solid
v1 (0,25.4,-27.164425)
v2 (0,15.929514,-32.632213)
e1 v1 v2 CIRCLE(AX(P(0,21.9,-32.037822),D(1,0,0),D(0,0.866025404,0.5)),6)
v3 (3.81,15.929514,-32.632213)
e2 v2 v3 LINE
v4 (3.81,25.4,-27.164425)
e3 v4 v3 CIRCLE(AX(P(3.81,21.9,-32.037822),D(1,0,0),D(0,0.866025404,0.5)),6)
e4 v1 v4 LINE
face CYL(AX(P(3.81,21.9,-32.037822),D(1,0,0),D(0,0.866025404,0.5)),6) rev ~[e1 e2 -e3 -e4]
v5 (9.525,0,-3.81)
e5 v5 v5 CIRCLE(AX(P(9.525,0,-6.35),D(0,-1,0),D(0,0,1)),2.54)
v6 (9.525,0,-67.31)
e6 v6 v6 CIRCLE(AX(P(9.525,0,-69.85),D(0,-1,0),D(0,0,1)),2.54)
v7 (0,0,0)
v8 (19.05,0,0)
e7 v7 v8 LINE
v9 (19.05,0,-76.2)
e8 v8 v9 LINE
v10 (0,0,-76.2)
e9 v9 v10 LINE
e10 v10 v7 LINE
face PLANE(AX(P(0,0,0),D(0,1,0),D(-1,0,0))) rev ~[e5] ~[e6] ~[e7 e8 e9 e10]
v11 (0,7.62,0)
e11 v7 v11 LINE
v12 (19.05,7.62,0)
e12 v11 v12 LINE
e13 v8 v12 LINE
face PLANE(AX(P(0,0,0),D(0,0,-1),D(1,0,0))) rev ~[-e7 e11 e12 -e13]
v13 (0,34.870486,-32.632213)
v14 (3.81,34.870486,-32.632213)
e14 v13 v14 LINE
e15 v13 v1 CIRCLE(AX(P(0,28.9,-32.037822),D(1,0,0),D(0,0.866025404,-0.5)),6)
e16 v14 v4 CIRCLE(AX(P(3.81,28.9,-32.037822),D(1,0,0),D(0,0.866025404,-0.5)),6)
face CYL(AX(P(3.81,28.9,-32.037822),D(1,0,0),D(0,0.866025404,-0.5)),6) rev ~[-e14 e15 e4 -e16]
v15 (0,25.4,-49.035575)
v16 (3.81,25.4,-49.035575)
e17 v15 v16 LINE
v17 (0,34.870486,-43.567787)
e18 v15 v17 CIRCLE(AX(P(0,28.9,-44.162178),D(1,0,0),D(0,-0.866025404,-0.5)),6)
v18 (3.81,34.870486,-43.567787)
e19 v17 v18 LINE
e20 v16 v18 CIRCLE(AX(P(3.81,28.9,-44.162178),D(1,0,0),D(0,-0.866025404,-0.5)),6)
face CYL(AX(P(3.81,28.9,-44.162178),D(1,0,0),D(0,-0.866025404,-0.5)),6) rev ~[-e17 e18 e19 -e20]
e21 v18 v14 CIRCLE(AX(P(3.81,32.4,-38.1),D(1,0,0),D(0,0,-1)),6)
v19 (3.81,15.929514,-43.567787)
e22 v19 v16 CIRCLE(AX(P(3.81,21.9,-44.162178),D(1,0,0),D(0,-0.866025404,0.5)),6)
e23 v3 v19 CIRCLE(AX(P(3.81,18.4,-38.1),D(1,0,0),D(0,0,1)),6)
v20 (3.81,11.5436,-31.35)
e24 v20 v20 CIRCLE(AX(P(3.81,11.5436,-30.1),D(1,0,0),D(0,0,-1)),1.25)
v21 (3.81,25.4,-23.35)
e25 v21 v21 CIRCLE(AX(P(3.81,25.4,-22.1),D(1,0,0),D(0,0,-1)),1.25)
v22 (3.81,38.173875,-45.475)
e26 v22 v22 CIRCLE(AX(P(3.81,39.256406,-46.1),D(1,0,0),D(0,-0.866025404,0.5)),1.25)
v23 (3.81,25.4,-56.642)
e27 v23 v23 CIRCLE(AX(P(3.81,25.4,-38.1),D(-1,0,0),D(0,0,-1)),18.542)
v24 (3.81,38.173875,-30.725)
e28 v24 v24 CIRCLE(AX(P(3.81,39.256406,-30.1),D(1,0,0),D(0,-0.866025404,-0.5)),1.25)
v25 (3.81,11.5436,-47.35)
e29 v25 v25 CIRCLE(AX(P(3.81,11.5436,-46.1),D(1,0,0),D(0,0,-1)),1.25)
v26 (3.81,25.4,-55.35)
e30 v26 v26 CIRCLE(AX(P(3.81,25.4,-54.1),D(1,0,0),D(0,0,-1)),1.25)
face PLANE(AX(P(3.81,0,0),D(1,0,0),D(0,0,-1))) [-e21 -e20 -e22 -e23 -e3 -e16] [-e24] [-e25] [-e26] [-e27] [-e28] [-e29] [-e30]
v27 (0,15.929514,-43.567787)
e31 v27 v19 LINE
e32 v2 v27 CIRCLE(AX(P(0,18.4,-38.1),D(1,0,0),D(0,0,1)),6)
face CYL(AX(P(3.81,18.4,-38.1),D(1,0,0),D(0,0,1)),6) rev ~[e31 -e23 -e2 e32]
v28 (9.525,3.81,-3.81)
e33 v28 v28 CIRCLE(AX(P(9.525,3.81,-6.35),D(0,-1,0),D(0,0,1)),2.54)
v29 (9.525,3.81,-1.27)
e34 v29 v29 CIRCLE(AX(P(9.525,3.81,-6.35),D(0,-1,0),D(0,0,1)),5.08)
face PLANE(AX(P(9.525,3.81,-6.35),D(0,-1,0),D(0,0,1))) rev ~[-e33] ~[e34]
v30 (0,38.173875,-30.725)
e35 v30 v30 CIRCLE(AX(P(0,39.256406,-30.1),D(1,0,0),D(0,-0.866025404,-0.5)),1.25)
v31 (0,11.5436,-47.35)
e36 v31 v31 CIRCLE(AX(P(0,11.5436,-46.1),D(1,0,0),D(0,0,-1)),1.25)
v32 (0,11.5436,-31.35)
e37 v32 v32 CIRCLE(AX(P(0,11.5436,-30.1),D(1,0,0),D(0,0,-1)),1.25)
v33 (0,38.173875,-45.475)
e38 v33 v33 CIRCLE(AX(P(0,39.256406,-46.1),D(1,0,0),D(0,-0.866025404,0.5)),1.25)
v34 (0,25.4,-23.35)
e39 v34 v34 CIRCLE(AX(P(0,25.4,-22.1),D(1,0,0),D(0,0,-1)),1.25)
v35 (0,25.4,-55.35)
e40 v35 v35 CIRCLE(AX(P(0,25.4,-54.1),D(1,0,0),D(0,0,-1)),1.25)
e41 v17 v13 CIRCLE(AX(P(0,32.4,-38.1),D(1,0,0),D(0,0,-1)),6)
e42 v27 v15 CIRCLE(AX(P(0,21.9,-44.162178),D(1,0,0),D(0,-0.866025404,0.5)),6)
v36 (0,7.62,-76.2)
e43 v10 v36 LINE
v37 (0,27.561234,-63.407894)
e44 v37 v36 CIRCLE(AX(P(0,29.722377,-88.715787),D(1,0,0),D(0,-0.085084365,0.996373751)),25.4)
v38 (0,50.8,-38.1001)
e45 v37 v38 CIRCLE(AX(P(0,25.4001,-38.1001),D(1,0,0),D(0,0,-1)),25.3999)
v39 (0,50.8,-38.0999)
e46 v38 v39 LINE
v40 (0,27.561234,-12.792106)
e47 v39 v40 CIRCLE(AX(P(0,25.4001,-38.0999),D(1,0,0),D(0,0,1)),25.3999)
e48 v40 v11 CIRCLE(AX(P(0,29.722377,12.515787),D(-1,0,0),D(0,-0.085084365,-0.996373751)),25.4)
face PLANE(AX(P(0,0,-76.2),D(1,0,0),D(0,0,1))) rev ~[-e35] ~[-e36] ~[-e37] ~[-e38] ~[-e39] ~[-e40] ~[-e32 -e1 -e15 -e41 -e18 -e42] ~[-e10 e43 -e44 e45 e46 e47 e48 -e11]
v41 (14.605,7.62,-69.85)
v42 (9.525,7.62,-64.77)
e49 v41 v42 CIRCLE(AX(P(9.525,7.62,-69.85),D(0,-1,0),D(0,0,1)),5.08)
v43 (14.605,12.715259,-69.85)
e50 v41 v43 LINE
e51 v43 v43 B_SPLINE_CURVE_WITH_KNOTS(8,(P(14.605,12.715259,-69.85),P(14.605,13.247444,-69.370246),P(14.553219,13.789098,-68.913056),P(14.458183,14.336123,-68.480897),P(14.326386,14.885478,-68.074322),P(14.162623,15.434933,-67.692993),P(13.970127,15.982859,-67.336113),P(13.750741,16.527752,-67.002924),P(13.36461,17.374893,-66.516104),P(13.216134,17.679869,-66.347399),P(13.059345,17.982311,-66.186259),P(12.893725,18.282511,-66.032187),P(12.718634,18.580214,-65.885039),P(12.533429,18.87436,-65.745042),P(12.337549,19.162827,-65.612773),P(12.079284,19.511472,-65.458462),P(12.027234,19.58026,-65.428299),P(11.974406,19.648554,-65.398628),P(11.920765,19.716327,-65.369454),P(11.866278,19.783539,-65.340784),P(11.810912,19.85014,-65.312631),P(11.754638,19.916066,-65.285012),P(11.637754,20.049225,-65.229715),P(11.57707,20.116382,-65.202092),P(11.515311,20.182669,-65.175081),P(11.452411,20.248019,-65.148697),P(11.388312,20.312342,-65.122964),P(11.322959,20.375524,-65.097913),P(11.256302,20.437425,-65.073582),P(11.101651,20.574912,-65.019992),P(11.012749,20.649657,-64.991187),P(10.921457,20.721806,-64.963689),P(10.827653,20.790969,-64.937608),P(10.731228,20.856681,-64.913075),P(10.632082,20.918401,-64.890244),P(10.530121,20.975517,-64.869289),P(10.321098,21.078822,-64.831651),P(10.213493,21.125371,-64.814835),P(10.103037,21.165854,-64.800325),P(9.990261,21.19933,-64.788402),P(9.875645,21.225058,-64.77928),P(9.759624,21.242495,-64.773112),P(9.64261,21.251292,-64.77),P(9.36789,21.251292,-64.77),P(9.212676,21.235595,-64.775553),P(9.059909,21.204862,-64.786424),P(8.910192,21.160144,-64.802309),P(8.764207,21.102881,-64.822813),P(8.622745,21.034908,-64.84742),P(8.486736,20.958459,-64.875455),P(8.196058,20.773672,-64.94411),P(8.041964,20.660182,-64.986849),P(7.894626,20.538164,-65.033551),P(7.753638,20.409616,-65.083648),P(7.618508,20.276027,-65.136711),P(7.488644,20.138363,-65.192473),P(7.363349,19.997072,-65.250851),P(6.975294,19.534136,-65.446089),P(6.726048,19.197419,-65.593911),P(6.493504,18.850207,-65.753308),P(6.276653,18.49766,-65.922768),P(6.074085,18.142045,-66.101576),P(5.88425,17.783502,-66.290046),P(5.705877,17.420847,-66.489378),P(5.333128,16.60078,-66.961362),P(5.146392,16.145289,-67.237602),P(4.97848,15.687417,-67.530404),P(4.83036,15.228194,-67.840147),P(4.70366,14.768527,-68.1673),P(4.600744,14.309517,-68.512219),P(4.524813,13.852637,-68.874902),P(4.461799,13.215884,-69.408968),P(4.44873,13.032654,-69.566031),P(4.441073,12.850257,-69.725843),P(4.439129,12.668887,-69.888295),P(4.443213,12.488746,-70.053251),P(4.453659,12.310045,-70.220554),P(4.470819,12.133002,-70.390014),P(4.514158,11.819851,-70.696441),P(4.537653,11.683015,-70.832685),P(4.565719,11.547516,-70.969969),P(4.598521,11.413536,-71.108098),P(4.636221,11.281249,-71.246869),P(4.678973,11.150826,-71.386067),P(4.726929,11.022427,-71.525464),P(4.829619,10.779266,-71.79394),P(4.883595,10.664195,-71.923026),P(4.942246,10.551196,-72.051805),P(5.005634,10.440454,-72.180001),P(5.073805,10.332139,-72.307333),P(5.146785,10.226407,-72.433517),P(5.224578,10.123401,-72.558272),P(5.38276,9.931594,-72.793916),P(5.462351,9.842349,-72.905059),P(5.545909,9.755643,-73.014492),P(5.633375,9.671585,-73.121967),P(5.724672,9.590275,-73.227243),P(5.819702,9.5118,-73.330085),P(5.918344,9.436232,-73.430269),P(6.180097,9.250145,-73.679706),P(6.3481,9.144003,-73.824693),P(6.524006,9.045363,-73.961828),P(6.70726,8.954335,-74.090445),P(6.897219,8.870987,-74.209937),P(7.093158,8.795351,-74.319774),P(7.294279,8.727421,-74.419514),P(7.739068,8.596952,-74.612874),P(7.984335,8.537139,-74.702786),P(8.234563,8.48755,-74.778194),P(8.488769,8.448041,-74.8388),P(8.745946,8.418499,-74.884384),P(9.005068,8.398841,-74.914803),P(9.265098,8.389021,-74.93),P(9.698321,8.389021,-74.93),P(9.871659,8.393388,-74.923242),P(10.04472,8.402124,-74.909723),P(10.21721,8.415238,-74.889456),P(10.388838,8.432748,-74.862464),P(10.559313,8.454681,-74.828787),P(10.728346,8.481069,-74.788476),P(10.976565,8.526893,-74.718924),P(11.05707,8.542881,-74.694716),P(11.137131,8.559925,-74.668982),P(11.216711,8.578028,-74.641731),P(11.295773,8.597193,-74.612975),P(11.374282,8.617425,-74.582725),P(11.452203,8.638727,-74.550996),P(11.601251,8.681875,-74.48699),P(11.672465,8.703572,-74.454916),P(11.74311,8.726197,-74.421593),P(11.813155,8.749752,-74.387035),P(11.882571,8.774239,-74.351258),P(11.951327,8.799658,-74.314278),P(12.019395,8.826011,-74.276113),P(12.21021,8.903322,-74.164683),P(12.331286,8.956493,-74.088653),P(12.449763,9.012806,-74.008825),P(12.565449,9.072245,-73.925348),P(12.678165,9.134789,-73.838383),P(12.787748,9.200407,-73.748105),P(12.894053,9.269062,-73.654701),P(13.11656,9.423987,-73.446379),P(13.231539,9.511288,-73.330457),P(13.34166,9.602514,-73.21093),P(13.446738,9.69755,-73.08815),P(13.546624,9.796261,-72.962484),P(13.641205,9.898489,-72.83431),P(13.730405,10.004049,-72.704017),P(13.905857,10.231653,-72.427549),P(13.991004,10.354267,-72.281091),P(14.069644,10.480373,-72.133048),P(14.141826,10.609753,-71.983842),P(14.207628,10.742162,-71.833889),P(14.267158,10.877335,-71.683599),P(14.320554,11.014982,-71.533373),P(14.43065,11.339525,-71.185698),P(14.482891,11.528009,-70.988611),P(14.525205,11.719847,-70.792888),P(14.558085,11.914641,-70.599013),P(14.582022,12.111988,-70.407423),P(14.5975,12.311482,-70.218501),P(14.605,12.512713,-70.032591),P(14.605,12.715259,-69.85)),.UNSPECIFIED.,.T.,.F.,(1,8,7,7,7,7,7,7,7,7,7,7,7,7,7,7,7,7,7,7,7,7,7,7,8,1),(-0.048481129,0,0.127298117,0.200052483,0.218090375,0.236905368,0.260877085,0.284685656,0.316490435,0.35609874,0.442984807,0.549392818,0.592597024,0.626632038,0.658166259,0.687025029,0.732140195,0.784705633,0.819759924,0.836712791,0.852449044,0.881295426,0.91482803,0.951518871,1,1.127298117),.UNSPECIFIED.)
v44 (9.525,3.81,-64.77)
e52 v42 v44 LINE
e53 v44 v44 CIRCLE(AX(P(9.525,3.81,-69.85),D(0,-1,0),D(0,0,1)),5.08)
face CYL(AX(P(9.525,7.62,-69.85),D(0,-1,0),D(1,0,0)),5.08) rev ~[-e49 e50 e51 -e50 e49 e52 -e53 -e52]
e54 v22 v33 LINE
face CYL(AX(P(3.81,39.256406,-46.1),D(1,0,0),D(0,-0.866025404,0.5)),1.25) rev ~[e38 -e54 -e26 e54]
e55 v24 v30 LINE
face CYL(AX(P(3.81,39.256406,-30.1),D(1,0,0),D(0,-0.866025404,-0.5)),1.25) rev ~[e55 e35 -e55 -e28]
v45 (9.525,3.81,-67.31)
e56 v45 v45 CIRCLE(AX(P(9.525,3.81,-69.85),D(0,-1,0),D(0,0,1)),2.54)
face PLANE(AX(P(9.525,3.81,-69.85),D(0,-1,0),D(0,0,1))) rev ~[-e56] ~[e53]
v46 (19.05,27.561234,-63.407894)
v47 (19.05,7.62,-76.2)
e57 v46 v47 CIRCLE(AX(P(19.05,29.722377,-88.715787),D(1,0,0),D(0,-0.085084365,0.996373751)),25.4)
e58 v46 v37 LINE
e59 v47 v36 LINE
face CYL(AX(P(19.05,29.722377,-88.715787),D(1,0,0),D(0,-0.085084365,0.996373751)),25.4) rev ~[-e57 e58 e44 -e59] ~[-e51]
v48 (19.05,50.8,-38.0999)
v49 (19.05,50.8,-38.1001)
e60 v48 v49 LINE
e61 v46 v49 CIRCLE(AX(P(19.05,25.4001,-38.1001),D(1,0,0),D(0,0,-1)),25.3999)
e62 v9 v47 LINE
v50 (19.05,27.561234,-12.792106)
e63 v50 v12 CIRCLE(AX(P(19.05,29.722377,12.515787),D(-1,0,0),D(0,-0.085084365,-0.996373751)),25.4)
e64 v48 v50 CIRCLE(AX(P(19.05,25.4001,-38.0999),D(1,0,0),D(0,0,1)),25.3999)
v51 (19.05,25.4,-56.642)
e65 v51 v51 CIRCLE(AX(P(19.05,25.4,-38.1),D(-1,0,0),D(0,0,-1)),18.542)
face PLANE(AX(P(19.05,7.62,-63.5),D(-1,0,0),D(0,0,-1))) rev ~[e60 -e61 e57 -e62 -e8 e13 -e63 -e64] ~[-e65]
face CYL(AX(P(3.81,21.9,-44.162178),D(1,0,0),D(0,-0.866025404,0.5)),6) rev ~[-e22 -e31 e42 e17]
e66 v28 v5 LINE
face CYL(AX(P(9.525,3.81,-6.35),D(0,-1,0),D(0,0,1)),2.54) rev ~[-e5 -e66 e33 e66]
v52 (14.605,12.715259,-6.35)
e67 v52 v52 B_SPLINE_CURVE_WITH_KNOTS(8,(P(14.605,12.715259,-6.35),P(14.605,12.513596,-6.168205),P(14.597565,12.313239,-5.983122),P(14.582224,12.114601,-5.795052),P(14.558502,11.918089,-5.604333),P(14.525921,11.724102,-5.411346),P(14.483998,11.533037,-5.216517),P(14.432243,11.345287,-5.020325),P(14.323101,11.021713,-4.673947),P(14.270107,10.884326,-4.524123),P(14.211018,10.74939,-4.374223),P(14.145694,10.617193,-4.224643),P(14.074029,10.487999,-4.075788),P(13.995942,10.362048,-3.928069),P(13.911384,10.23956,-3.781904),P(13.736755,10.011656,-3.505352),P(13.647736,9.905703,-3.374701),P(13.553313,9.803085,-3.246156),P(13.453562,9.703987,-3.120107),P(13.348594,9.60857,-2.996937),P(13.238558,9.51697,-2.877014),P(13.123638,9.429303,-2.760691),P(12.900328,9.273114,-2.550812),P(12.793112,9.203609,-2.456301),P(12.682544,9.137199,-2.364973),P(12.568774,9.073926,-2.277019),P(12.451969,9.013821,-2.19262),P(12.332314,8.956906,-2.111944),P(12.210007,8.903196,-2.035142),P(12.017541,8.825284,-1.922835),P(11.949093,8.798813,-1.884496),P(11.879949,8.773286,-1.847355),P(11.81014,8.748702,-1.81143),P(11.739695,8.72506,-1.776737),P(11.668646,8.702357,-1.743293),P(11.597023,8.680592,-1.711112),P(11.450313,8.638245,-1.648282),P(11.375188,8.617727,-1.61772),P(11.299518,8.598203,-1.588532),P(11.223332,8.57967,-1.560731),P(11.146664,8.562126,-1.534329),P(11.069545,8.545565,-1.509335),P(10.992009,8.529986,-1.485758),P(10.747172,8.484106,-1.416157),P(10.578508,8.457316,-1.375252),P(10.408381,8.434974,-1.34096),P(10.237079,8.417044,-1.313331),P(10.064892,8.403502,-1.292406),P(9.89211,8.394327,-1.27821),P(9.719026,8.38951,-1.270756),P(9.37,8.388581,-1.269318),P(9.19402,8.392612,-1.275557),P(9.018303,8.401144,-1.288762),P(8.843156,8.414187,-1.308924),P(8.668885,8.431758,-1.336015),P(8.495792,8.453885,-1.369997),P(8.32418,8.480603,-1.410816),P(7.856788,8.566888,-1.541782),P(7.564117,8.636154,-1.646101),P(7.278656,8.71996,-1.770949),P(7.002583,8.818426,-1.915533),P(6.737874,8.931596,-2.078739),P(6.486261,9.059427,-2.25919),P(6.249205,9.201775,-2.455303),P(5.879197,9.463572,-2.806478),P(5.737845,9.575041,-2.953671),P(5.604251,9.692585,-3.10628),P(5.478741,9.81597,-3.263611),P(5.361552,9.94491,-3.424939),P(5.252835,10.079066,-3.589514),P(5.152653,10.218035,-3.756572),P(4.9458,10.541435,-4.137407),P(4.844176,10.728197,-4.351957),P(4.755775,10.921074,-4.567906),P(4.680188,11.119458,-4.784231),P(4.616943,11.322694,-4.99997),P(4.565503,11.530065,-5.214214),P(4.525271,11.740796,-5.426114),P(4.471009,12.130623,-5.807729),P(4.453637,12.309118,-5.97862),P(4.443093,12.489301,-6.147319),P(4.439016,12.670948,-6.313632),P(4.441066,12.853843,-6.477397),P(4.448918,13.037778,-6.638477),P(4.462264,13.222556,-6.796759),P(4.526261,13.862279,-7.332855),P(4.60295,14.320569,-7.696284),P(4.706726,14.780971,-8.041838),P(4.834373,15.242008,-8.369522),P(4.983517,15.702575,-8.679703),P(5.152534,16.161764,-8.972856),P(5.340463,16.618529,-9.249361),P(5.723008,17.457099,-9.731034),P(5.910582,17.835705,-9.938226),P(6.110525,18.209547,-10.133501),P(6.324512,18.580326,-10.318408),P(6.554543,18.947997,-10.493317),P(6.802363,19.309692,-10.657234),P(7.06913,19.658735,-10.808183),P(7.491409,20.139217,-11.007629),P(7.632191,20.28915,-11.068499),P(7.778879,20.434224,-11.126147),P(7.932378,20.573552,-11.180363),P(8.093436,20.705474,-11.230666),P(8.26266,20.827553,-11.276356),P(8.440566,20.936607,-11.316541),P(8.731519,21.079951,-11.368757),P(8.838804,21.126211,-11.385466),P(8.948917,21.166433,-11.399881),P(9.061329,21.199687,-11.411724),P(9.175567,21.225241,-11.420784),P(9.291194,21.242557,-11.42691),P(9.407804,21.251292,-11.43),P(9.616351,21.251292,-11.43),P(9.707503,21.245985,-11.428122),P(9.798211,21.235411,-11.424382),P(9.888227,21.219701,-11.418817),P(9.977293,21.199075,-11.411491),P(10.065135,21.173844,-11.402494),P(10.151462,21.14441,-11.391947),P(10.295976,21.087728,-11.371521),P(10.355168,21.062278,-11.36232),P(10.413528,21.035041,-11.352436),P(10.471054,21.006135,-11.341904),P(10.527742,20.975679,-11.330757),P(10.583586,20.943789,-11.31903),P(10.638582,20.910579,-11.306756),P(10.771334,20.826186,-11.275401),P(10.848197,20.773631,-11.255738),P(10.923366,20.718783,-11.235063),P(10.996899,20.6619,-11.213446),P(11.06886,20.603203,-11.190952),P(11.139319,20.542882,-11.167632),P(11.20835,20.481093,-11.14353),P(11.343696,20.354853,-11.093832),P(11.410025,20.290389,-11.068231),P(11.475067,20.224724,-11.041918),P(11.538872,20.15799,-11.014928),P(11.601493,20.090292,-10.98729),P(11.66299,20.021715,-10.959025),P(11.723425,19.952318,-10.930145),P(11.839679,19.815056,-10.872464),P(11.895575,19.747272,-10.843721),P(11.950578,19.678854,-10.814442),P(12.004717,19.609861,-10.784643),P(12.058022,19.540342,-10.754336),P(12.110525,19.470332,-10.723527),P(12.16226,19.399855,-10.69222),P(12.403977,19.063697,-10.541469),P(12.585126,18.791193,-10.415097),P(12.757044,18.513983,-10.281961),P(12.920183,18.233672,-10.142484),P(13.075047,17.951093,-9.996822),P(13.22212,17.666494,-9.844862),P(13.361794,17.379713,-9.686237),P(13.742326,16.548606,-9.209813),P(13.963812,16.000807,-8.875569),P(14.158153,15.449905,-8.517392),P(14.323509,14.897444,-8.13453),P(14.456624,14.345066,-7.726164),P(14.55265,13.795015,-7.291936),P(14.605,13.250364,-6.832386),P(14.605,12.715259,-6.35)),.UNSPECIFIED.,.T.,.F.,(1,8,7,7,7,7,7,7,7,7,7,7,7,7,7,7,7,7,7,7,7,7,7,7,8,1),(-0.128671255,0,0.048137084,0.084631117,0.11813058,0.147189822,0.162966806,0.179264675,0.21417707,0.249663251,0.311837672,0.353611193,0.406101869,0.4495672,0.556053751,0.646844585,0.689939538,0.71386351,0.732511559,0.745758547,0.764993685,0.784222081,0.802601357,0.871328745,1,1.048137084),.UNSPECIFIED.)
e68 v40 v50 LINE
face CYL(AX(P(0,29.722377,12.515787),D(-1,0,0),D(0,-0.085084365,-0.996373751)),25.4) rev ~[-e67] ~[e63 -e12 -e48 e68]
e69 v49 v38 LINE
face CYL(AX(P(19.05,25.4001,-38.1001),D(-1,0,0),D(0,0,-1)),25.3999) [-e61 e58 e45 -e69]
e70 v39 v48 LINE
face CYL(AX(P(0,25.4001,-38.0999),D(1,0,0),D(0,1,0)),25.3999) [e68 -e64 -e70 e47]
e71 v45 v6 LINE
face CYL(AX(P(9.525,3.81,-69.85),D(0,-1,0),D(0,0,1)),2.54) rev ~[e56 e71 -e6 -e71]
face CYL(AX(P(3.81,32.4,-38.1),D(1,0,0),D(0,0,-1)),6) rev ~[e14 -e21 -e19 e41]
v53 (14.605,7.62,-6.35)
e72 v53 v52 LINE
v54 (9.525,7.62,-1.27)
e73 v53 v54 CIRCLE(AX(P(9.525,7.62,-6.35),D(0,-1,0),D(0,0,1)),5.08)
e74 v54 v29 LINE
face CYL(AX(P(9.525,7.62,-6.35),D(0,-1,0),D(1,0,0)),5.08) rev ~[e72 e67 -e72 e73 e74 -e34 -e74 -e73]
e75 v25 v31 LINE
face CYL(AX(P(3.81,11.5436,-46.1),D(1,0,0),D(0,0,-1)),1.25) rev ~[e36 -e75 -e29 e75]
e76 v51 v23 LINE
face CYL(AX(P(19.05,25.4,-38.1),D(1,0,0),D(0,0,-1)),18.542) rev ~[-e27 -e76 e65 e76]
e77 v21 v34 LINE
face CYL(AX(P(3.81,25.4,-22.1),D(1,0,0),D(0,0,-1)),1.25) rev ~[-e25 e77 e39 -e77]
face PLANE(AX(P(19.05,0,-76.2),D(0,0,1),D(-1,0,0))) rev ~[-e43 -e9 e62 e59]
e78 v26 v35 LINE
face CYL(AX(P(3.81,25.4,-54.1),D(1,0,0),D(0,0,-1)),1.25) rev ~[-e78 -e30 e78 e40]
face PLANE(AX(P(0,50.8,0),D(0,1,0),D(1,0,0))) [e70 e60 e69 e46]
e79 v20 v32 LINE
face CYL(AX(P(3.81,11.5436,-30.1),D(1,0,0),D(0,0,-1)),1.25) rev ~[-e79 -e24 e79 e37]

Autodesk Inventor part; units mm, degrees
ref_plane "YZ Plane" through (0, 0, 0) normal (1, 0, 0) x (0, 1, 0)
ref_plane "XZ Plane" through (0, 0, 0) normal (0, 1, 0) x (-1, 0, 0)
ref_plane "XY Plane" through (0, 0, 0) normal (0, 0, 1) x (1, 0, 0)
sketch "Sketch1" plane through (0, 0, 0) normal (0, 1, 0) x (-1, 0, 0)
  line L0 (0, 0) -> (-19.05, 0)
  line L1 (-19.05, 0) -> (-19.05, -76.2)
  line L2 (-19.05, -76.2) -> (0, -76.2)
  line L3 (0, -76.2) -> (0, 0)
  dimension "d0" = 19.05
  dimension "d1" = 76.2
extrude "Extrusion1" add sketch "Sketch1" along normal blind 7.62
sketch "Sketch2" plane through (0, 7.62, 0) normal (0, 1, 0) x (1, 0, 0)
  line L0 (0, 0) -> (0, 12.7)
  line L1 (0, 12.7) -> (19.05, 12.7)
  line L2 (19.05, 12.7) -> (19.05, 63.5)
  line L3 (19.05, 63.5) -> (0, 63.5)
  line L4 (0, 63.5) -> (0, 12.7)
  dimension "d4" = 12.7
  dimension "d5" = 19.05
  dimension "d6" = 50.8
extrude "Extrusion2" add sketch "Sketch2" along normal blind 43.18
sketch "Sketch3" plane through (19.05, 0, 0) normal (1, 0, 0) x (0, 0, -1)
  line L0 (12.7, 50.8) -> (63.5, 50.8) projected
  line L1 (38.1, 50.8) -> (38.1, 25.4)
  circle A0 centre (38.1, 25.4) radius 18.542
  point P0 (0, 0)
  dimension "d9" = 25.4
  dimension "d10" = 37.084
extrude "Extrusion3" cut sketch "Sketch3" against normal blind 15.24
fillet "Fillet1" radius 25.4 2 edges at (9.525, 50.8, -63.5) (9.525, 50.8, -12.7)
sketch "Sketch6" plane through (0, 7.62, 0) normal (0, 1, 0) x (1, 0, 0)
  line L0 (0, 0) -> (19.05, 0) projected
  line L1 (9.525, 0) -> (9.525, 6.35)
  line L2 (19.05, 76.2) -> (0, 76.2) projected
  line L3 (9.525, 76.2) -> (9.525, 69.85)
  dimension "d20" = 6.35
  dimension "d21" = 6.35
fillet "Fillet2" radius 25.4 2 edges at (9.525, 7.62, -63.5) (9.525, 7.62, -12.7)
hole "Hole1" at (9.525, 7.62, -6.35) at (9.525, 7.62, -69.85) direction (0, -1, 0) diameter 5.08 end through all counterbore diameter 10.16 counterbore depth 3.81
sketch "Sketch7" plane through (9.525, 7.62, -6.35) normal (0, -1, 0) x (1, 0, 0)
  circle A0 centre (0, 0) radius 5.08
  circle A1 centre (0, -63.5) radius 2.54 projected
  line L0 (-2.54, -63.5) -> (0, -63.5)
  circle A2 centre (0, -63.5) radius 5.08
  point P0 (-9.525, 6.35)
  dimension "d30" = 10.16
  dimension "d31" = 10.16
extrude "Extrusion5" cut sketch "Sketch7" against normal blind 15.24 contours A0 | A1 | A2
sketch "Sketch10" plane through (3.81, 25.4, -38.1) normal (1, 0, 0) x (0, 0, -1)
  circle A0 centre (0, 0) radius 18.542 projected
  circle A1 centre (-8, -13.8564) radius 1.25
  circle A2 centre (0, 7) radius 6
  circle A3 centre (16, 0) radius 1.25
  circle A4 centre (8, -13.8564) radius 1.25
  circle A5 centre (-16, 0) radius 1.25
  circle A6 centre (8, -13.8564) radius 1.25
  circle A7 centre (-8, -13.8564) radius 1.25
  circle A8 centre (-8, -13.8564) radius 1.25
  circle A9 centre (-16, 0) radius 1.25
  circle A10 centre (16, 0) radius 1.25
  point P0 (-38.1, -25.4)
extrude "Extrusion8" cut sketch "Sketch10" against normal blind 25.4 contours A1 | A2 | A3 | A4 | A5
pattern_circular "Circular Pattern4" count 6 over 360 about axis through (19.05, 25.4, -38.1) along (-1, 0, 0) of "Extrusion8"
sketch "Sketch14" plane through (3.81, 0, 0) normal (1, 0, 0) x (0, 0, -1)
  arc A0 (36.735, 25.4) -> (37.4175, 26.5821) centre (31.9408, 28.956) ccw projected
  arc A1 (37.4175, 24.2179) -> (36.735, 25.4) centre (31.9408, 21.844) ccw projected
  arc A2 (38.7825, 24.2179) -> (37.4175, 24.2179) centre (38.1, 18.288) ccw projected
  arc A3 (39.465, 25.4) -> (38.7825, 24.2179) centre (44.2592, 21.844) ccw projected
  arc A4 (38.7825, 26.5821) -> (39.465, 25.4) centre (44.2592, 28.956) ccw projected
  arc A5 (37.4175, 26.5821) -> (38.7825, 26.5821) centre (38.1, 32.512) ccw projected
  line L0 (38.7825, 24.2179) -> (37.4175, 24.2179)
  line L1 (37.4175, 24.2179) -> (36.735, 25.4)
  line L2 (36.735, 25.4) -> (37.4175, 26.5821)
  line L3 (37.4175, 26.5821) -> (38.7825, 26.5821)
  line L4 (38.7825, 26.5821) -> (39.465, 25.4)
  line L5 (39.465, 25.4) -> (38.7825, 24.2179)
  point P0 (0, 0)
  point P1 (38.1, 25.4)
extrude "Extrusion10" cut sketch "Sketch14" against normal blind 25.4 contours A0 A5 A4 A3 A2 A1
properties part number "Motor Mount V2"
